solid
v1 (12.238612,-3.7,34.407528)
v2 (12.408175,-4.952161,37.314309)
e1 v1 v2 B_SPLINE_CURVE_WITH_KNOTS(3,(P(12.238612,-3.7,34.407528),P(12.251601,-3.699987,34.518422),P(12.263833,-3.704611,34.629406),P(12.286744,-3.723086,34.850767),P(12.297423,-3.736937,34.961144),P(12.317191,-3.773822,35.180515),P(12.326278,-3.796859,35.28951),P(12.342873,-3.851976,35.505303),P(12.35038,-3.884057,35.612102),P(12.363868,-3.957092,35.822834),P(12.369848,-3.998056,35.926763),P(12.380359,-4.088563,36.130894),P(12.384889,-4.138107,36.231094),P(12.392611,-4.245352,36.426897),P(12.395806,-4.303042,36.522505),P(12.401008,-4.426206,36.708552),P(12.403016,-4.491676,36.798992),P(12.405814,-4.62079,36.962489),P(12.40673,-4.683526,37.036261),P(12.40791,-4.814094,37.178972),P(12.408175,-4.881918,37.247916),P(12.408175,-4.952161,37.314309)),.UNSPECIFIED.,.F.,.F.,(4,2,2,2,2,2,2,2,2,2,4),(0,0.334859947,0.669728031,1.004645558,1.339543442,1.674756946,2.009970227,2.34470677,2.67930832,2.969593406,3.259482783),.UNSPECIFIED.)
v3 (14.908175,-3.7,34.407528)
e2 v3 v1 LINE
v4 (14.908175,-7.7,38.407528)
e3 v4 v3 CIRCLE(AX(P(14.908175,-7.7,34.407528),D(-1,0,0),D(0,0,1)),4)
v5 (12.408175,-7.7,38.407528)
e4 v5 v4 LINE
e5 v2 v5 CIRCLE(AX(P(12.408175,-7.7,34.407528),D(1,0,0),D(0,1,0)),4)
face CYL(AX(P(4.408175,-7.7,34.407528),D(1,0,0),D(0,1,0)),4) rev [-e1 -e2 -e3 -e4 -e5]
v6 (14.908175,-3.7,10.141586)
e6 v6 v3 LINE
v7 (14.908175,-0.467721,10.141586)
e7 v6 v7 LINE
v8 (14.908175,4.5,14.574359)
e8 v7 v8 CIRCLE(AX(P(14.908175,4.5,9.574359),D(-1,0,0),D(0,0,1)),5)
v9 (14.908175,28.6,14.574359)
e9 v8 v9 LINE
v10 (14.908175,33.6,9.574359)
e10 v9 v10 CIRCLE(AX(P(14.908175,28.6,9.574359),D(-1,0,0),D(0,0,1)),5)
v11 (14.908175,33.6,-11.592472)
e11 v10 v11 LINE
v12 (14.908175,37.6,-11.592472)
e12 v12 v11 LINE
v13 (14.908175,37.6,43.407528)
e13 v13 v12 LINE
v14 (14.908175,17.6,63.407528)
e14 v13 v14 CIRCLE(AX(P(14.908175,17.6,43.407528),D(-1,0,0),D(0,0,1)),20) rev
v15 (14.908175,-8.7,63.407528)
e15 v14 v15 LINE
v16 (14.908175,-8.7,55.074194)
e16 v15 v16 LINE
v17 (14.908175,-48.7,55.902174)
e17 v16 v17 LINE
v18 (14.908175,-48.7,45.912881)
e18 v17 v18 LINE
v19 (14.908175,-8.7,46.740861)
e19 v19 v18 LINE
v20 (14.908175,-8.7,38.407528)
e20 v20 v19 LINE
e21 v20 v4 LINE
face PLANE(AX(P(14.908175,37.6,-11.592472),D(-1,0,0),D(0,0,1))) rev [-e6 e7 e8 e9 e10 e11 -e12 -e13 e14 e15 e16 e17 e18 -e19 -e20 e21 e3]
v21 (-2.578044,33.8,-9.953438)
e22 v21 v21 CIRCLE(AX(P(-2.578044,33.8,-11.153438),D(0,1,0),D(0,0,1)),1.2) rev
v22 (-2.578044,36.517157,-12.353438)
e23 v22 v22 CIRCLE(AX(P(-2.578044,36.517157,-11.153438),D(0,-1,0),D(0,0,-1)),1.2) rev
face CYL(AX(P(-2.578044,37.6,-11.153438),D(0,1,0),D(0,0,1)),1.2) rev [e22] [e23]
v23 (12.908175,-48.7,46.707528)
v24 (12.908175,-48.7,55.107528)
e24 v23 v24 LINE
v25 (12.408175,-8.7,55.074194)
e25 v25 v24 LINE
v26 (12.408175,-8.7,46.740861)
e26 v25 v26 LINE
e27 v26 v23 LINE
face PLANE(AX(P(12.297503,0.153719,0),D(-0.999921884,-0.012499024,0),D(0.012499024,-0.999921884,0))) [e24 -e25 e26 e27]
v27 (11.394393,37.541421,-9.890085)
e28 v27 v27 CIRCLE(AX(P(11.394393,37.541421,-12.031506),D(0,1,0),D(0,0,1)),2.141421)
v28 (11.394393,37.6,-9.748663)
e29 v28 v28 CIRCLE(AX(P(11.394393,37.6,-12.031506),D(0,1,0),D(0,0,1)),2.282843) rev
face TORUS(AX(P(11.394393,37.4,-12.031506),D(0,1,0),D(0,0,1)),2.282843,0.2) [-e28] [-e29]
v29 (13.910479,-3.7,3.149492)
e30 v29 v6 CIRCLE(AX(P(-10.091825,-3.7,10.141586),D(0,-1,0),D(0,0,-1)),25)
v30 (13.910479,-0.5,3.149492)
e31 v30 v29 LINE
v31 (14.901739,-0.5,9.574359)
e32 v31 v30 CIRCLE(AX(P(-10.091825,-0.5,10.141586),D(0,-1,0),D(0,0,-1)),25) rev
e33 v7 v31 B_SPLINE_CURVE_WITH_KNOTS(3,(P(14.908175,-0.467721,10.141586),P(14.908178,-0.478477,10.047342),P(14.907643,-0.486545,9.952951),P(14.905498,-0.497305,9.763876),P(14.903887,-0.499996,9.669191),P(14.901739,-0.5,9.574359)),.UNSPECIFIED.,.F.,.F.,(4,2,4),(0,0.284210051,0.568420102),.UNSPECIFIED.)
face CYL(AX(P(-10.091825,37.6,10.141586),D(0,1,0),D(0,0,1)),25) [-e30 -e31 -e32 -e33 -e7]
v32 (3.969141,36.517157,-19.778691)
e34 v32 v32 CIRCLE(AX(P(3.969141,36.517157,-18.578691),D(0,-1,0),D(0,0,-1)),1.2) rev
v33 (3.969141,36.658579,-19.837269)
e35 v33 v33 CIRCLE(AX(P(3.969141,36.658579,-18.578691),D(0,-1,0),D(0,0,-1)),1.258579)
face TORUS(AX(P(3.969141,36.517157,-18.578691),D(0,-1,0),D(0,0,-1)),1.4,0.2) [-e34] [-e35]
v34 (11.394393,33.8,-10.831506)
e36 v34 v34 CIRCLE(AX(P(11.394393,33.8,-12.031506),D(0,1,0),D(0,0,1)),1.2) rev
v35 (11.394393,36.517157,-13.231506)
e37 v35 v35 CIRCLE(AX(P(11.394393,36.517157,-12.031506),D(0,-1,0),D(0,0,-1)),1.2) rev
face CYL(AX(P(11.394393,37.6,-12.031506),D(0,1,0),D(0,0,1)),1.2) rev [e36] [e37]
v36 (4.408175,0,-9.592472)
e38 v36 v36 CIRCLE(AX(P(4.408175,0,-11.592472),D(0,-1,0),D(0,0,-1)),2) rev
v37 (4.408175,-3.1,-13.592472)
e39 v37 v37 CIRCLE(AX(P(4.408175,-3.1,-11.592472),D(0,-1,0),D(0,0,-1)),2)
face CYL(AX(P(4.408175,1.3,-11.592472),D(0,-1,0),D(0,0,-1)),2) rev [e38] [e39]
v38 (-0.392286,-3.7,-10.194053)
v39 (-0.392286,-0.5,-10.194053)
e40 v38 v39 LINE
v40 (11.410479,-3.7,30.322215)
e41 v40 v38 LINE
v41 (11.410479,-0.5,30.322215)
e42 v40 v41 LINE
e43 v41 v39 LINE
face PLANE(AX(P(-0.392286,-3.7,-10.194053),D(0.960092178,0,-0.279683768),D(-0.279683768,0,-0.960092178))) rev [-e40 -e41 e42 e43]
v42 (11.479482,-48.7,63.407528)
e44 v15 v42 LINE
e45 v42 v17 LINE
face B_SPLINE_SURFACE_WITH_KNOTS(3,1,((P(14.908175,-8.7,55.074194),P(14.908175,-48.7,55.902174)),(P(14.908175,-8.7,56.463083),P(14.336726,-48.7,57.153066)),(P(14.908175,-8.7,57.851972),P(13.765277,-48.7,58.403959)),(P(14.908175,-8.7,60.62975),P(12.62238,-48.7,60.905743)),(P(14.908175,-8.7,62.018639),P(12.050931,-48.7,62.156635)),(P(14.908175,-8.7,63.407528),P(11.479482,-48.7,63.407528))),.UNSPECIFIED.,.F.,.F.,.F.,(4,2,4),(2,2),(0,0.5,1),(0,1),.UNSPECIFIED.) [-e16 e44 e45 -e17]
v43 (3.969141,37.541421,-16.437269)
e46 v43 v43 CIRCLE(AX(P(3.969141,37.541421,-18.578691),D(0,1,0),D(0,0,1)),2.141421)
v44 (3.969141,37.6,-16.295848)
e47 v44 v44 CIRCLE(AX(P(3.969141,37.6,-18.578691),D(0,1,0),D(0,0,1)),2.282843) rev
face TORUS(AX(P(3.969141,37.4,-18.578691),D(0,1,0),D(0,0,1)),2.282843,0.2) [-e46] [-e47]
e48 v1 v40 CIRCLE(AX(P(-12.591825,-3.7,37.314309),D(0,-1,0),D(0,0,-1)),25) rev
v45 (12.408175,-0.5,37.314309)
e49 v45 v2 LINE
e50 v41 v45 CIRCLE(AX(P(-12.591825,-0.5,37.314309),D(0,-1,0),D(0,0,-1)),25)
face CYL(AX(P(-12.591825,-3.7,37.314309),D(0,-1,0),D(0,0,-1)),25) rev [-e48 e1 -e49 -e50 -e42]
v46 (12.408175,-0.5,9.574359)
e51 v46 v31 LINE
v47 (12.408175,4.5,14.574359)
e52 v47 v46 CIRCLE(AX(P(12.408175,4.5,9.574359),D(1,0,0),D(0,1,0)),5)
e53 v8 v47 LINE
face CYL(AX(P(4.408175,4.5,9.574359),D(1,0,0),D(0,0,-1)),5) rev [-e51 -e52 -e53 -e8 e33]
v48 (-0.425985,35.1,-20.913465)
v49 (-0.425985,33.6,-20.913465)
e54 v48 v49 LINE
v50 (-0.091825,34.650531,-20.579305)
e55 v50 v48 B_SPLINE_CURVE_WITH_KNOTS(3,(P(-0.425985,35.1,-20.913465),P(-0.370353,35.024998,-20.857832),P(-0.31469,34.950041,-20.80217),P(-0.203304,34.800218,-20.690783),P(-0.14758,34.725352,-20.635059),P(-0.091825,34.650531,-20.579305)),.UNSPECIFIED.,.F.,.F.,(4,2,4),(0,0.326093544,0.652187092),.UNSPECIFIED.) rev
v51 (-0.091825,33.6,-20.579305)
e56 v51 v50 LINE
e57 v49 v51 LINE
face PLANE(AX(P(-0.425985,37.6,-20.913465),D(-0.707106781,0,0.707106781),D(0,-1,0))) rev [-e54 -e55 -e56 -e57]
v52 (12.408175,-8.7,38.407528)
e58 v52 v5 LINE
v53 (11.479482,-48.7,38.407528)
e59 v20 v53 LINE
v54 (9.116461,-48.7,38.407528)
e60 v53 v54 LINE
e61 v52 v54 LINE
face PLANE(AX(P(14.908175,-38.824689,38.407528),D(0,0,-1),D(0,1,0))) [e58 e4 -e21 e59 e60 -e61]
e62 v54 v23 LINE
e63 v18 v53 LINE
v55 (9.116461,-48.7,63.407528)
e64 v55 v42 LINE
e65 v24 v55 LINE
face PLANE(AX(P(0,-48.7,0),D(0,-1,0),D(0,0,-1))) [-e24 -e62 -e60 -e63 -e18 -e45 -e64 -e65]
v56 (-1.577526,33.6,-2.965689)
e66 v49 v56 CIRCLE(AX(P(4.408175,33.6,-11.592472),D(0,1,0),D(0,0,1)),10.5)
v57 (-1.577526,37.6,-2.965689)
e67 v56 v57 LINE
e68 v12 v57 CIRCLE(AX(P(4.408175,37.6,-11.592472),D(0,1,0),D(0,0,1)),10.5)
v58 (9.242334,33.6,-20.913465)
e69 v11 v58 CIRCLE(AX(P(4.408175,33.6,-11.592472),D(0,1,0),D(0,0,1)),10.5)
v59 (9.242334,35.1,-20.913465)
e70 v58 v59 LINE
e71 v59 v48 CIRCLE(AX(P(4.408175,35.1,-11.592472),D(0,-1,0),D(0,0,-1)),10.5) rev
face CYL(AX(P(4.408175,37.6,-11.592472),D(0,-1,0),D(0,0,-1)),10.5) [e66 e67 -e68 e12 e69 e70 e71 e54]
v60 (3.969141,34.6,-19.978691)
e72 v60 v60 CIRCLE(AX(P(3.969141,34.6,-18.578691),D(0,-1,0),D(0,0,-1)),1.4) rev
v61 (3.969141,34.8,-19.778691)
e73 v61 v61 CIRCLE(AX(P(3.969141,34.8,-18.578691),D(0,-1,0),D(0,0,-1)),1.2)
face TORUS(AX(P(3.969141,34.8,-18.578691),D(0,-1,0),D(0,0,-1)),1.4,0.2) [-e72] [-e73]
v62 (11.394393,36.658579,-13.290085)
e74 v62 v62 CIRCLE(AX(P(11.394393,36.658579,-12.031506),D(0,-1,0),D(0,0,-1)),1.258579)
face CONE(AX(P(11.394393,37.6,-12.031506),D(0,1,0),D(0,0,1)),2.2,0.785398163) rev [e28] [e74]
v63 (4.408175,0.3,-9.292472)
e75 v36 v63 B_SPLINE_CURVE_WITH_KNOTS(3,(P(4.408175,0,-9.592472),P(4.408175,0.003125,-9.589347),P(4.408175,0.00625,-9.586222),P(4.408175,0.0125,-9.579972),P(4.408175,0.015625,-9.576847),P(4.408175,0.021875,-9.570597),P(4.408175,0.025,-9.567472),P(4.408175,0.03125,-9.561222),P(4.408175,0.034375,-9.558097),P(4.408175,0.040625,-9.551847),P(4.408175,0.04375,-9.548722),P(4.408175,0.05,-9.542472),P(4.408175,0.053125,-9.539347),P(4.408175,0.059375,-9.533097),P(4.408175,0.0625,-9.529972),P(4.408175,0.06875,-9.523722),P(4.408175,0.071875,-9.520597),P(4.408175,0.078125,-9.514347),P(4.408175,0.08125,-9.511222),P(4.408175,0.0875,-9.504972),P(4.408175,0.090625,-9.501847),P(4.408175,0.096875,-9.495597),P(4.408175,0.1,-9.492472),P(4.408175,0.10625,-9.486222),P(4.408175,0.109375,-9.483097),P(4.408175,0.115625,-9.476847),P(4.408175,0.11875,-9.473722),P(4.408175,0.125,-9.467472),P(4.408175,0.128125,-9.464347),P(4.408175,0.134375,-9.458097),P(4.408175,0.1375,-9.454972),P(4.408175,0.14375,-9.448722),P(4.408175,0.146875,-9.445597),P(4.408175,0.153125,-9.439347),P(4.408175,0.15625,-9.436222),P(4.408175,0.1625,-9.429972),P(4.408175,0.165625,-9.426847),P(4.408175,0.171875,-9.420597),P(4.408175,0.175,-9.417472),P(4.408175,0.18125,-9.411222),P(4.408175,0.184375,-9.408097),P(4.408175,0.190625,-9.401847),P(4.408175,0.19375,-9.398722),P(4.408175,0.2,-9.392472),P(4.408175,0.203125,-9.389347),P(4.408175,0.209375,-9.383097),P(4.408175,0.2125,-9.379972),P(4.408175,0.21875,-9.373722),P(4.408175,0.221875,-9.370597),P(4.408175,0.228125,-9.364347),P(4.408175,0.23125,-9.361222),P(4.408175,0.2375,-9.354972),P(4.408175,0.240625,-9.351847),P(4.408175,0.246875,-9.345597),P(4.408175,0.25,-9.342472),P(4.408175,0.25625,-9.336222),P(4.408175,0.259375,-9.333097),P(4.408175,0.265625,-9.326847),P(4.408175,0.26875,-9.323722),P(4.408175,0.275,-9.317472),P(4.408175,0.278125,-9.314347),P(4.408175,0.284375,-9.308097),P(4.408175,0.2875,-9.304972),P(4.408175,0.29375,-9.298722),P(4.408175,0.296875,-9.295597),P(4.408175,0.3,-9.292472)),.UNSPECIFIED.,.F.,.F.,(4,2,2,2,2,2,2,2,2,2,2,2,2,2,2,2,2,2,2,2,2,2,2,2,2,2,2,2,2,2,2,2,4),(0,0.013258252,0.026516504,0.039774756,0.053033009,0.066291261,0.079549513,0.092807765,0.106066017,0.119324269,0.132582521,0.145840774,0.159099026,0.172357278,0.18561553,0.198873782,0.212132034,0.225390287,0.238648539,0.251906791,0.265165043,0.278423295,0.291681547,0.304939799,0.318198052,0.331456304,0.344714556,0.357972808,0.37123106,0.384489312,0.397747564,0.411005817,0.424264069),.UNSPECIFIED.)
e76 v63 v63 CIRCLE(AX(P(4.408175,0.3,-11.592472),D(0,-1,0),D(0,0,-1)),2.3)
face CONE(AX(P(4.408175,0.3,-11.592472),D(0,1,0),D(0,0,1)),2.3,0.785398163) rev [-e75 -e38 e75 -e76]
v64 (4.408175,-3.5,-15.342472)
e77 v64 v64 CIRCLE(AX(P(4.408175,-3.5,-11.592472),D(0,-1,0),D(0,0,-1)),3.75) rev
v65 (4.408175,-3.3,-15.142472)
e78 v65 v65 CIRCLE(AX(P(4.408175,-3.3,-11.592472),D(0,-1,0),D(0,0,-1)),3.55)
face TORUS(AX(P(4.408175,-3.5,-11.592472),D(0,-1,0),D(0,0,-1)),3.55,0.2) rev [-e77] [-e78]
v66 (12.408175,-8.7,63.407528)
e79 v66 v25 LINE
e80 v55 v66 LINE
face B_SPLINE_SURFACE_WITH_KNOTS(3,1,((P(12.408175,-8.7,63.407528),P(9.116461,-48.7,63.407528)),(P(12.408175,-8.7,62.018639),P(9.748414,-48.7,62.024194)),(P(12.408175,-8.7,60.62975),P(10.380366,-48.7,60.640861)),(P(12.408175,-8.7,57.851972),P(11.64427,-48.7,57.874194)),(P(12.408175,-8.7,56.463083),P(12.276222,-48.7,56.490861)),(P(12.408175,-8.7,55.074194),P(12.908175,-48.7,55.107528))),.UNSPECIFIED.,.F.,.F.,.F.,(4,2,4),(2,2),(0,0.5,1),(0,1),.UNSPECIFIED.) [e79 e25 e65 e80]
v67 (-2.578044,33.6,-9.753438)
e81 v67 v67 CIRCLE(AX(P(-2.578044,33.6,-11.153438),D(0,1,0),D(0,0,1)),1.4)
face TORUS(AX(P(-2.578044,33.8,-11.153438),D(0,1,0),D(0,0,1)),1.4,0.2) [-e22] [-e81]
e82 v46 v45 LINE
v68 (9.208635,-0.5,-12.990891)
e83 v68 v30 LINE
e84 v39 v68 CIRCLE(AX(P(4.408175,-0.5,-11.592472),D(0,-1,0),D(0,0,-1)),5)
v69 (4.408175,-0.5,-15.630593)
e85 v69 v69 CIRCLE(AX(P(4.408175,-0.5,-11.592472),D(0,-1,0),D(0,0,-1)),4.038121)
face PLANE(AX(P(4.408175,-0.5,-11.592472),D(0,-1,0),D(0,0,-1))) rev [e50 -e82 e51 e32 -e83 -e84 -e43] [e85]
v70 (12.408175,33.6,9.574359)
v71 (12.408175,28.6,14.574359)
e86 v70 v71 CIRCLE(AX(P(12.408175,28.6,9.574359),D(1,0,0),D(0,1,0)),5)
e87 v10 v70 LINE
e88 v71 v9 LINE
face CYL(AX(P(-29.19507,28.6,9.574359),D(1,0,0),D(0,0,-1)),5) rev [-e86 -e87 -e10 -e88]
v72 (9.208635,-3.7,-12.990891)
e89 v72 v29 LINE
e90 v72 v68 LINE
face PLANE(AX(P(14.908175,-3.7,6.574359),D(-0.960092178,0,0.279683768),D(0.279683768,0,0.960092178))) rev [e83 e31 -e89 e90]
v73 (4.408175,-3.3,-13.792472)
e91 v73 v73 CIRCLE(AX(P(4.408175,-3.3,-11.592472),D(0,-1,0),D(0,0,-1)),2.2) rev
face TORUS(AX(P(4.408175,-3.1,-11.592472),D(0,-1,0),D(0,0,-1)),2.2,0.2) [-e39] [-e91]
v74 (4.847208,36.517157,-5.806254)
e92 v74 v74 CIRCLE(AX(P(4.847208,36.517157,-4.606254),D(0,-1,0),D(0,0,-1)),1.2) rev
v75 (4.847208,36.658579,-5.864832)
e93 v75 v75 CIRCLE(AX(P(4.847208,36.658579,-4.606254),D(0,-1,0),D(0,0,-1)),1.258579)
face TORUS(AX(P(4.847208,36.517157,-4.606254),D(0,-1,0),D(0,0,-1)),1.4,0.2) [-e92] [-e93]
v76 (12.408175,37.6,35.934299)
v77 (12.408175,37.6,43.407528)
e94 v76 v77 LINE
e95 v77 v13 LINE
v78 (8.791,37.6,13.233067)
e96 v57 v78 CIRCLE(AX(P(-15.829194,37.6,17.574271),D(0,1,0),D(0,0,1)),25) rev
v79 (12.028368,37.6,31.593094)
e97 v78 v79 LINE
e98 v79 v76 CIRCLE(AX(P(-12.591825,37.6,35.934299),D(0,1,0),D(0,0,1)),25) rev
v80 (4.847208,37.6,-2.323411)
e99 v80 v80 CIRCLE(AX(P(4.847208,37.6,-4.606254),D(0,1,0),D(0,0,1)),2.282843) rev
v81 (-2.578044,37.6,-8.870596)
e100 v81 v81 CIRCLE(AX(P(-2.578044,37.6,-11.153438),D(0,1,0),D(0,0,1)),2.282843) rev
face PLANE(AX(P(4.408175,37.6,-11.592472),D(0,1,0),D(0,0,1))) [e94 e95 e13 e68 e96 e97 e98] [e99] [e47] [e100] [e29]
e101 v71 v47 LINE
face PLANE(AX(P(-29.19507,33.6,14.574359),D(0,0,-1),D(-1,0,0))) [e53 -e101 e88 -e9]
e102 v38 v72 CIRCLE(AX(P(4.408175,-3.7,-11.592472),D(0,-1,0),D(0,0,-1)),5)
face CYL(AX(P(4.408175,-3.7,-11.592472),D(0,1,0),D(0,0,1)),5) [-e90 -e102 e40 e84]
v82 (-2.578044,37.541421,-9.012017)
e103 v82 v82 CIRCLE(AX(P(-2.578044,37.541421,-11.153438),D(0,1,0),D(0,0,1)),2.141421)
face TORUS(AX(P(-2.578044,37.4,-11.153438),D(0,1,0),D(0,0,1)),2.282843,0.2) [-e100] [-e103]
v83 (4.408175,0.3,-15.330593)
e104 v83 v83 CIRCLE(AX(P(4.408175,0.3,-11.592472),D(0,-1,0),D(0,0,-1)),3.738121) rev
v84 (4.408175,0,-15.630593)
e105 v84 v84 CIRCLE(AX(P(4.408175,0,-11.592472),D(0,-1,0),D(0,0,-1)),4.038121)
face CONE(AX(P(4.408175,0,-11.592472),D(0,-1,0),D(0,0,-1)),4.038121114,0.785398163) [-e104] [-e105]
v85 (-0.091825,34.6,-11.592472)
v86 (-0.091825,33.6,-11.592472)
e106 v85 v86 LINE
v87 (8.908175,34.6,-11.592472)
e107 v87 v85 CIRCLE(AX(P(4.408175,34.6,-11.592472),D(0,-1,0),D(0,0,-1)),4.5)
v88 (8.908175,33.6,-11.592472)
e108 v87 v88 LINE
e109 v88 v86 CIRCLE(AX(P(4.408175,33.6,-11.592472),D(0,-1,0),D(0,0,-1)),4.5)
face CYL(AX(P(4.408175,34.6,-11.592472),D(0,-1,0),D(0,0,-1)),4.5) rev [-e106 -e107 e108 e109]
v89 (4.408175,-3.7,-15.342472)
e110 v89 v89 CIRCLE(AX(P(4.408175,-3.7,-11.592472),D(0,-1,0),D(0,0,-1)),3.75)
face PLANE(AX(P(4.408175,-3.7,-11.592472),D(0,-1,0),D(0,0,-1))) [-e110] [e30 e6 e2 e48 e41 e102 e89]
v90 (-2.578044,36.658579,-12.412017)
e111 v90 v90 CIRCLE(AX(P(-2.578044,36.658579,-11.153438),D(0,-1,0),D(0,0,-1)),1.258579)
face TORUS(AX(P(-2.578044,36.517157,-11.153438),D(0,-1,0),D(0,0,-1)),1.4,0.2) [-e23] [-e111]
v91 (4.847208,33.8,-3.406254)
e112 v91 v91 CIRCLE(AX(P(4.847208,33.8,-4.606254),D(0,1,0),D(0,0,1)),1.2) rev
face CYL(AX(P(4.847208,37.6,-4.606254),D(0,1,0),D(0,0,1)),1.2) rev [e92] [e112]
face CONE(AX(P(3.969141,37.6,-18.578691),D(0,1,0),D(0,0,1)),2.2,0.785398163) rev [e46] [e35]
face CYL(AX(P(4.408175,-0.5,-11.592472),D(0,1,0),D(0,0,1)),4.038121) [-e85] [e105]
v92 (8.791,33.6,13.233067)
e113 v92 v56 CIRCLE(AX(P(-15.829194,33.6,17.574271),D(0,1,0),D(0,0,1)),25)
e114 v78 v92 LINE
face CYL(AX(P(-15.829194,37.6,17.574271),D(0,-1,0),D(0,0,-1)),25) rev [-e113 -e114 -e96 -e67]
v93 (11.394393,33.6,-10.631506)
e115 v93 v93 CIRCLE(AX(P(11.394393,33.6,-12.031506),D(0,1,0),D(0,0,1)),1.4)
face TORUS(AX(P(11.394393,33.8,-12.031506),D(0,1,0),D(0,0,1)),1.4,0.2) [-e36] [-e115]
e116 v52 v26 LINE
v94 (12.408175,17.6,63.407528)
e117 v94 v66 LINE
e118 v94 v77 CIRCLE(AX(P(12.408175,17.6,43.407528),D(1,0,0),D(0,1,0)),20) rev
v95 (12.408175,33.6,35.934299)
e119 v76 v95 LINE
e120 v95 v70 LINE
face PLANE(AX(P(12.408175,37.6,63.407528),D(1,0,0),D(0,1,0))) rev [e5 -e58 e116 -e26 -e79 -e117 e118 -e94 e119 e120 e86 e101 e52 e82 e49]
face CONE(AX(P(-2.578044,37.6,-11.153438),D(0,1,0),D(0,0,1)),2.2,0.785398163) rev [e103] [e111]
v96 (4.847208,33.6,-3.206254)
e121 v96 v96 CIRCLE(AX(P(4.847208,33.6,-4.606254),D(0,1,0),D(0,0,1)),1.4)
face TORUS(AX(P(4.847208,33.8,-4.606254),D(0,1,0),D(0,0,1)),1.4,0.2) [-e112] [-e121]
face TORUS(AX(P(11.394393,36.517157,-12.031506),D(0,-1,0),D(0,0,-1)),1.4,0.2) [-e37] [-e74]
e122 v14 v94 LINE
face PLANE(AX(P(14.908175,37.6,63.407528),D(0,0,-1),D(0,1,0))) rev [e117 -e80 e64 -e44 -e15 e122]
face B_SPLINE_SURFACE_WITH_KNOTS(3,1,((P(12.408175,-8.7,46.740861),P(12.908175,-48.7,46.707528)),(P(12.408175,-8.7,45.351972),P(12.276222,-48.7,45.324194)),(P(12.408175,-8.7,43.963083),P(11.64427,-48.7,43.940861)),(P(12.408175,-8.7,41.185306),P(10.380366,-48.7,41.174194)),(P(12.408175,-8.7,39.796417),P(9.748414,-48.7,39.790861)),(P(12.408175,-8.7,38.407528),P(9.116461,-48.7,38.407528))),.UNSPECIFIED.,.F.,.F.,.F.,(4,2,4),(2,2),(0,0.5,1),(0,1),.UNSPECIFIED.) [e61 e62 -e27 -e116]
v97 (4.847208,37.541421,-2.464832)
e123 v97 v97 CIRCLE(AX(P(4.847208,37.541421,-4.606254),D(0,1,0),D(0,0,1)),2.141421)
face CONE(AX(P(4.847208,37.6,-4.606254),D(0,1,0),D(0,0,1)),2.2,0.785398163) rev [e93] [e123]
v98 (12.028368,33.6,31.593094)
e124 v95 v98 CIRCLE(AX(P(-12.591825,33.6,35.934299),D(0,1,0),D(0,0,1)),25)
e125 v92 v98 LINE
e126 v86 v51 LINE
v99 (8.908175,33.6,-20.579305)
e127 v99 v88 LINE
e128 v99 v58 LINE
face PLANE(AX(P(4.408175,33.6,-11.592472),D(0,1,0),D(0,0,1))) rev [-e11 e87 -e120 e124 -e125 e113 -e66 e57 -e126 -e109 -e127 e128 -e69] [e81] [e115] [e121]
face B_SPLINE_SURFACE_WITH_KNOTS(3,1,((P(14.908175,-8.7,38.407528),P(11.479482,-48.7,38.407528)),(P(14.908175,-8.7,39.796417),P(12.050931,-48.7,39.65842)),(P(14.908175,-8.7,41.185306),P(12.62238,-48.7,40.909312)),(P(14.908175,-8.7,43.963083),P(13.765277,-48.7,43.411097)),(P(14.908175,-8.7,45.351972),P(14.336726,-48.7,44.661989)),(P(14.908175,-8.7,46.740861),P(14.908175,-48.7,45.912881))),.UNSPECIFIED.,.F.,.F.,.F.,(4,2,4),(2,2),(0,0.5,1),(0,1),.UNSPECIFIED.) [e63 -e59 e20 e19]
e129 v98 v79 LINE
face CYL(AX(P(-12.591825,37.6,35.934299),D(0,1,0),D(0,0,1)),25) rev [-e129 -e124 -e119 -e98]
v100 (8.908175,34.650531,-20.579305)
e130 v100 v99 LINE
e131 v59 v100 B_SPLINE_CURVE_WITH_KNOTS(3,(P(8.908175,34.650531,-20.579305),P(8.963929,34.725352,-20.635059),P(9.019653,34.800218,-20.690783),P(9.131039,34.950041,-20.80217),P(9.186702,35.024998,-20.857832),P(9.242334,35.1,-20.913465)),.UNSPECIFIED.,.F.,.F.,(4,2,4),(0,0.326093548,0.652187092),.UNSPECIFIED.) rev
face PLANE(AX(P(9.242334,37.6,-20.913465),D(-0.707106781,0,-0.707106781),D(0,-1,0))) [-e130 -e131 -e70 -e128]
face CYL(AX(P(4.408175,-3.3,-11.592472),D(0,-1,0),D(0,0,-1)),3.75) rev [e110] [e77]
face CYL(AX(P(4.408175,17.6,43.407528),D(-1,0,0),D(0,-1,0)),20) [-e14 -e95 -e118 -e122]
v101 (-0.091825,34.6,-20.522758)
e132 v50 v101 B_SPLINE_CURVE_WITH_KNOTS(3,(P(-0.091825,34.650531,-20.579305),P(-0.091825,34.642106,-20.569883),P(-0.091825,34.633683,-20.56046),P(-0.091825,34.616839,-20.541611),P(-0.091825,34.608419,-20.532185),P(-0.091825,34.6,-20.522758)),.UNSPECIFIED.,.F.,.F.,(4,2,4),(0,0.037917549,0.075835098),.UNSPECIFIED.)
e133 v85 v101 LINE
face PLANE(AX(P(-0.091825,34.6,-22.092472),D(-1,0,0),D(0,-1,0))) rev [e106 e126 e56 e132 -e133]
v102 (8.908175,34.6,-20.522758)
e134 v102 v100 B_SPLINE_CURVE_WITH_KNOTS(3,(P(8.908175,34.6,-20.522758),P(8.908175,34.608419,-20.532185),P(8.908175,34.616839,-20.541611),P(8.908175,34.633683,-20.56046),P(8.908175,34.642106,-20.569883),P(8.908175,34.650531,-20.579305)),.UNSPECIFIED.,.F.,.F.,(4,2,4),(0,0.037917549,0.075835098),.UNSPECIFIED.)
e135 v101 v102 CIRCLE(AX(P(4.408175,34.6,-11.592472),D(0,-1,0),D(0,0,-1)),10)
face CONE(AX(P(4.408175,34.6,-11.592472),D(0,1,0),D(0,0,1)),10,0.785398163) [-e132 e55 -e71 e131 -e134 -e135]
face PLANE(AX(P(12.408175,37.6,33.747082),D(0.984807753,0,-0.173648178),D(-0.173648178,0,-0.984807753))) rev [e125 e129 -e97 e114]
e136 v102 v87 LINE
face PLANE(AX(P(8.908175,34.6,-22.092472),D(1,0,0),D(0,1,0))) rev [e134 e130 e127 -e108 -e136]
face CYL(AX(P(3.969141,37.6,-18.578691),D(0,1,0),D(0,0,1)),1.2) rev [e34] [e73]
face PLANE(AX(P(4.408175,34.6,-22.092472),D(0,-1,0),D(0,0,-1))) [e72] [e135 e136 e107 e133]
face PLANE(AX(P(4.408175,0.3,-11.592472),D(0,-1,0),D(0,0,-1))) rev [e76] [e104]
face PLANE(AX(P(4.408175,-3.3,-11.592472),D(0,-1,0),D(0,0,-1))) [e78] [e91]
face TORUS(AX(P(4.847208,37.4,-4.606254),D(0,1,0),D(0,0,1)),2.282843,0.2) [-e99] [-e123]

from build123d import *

# Parameters (mm, degrees)
BOSS_EXTRUDE1_DEPTH                                 = 4
CSK_FOR_M2_COUNTERSUNK_FLAT_HEAD_SCREW1_D           = 2.4
CSK_FOR_M2_COUNTERSUNK_FLAT_HEAD_SCREW1_DEPTH       = 4
CSK_FOR_M2_COUNTERSUNK_FLAT_HEAD_SCREW1_CSINK_D     = 4.4
CSK_FOR_M2_COUNTERSUNK_FLAT_HEAD_SCREW1_CSINK_ANGLE = 90
CSK_FOR_M2_COUNTERSUNK_FLAT_HEAD_SCREW1_TIP         = 0.721032743
CUT_EXTRUDE1_DEPTH                                  = 1
BOSS_EXTRUDE2_START                                 = 0.2
SKETCH6_R                                           = 4.038121114
BOSS_EXTRUDE2_DEPTH                                 = 0.8
BOSS_EXTRUDE3_DEPTH                                 = 3.2
SKETCH10_R                                          = 2
CUT_EXTRUDE2_DEPTH                                  = 5
SKETCH11_R                                          = 3.75
CUT_EXTRUDE3_DEPTH                                  = 0.4
SKETCH12_W                                          = 2.5
SKETCH12_H                                          = 25
BOSS_EXTRUDE4_DEPTH                                 = 46.3
SKETCH15_W                                          = 23.833168605
SKETCH15_H                                          = 34.1
BOSS_EXTRUDE5_DEPTH                                 = 2.5
FILLET1_R                                           = 5
FILLET2_R                                           = 20
CHAMFER1_SIZE                                       = 0.3
FILLET3_R                                           = 0.2
CHAMFER2_SIZE                                       = 0.5
FILLET4_R                                           = 0.2
FILLET6_R                                           = 25
FILLET7_R                                           = 4


with BuildPart() as part:
    # Sketch2 → Boss-Extrude1 (new body)
    with BuildSketch(Plane(origin=(0, 33.6, 0), x_dir=(1, 0, 0), z_dir=(0, 1, 0))):
        with BuildLine():
            Line((14.908174518, 11.59247222), (14.908174518, -33.747082129))
            Line((14.908174518, -33.747082129), (14.908174518, -63.40752778))
            Line((14.908174518, -63.40752778), (12.408174518, -63.40752778))
            Line((12.408174518, -63.40752778), (12.408174518, -33.747082129))
            Line((12.408174518, -33.747082129), (6.236730193, 1.252917871))
            ThreePointArc((6.236730193, 1.252917871), (-3.637005238, 18.339699999), (14.908174518, 11.59247222))
        make_face()
    extrude(amount=BOSS_EXTRUDE1_DEPTH)

    # CSK for M2 Countersunk Flat Head Screw1
    with Locations(Plane(origin=(0, 37.6, 0), x_dir=(1, 0, 0), z_dir=(0, 1, 0))):
        with Locations((4.847208305, 4.606253691), (11.394393047, 12.031506008), (3.96914073, 18.578690749), (-2.578044011, 11.153438432)):
            CounterSinkHole(CSK_FOR_M2_COUNTERSUNK_FLAT_HEAD_SCREW1_D / 2, CSK_FOR_M2_COUNTERSUNK_FLAT_HEAD_SCREW1_CSINK_D / 2, depth=CSK_FOR_M2_COUNTERSUNK_FLAT_HEAD_SCREW1_DEPTH, counter_sink_angle=CSK_FOR_M2_COUNTERSUNK_FLAT_HEAD_SCREW1_CSINK_ANGLE)
            with Locations((0, 0, -(CSK_FOR_M2_COUNTERSUNK_FLAT_HEAD_SCREW1_DEPTH + CSK_FOR_M2_COUNTERSUNK_FLAT_HEAD_SCREW1_TIP / 2))):  # 118° drill point
                Cone(0, CSK_FOR_M2_COUNTERSUNK_FLAT_HEAD_SCREW1_D / 2, CSK_FOR_M2_COUNTERSUNK_FLAT_HEAD_SCREW1_TIP, mode=Mode.SUBTRACT)

    # Sketch5 → Cut-Extrude1 (cut)
    with BuildSketch(Plane.XZ.offset(-33.6)):
        with BuildLine():
            Line((-0.091825482, -22.09247222), (-0.091825482, -11.59247222))
            ThreePointArc((-0.091825482, -11.59247222), (4.408174518, -7.09247222), (8.908174518, -11.59247222))
            Line((8.908174518, -11.59247222), (8.908174518, -22.09247222))
            ThreePointArc((8.908174518, -22.09247222), (4.408174518, -26.59247222), (-0.091825482, -22.09247222))
        make_face()
    extrude(amount=-CUT_EXTRUDE1_DEPTH, mode=Mode.SUBTRACT)



with BuildPart() as body_2:
    # Sketch6 → Boss-Extrude2 (new body)
    with BuildSketch(Plane.XZ.offset(-0.5).offset(BOSS_EXTRUDE2_START)):
        with Locations(Location((4.408174518, -11.59247222, 0), (0, 0, 270))):
            Circle(SKETCH6_R)
    extrude(amount=BOSS_EXTRUDE2_DEPTH)

    # Sketch7 → Boss-Extrude3 (add)
    with BuildSketch(Plane.XZ.offset(0.5)):
        with BuildLine():
            Line((-0.392286371, -10.194053378), (12.408174518, 33.747082129))
            Line((12.408174518, 33.747082129), (12.408174518, 63.40752778))
            Line((12.408174518, 63.40752778), (14.908174518, 63.40752778))
            Line((14.908174518, 63.40752778), (14.908174518, 6.574359175))
            Line((14.908174518, 6.574359175), (9.208635406, -12.990891062))
            ThreePointArc((9.208635406, -12.990891062), (3.009755675, -16.392933108), (-0.392286371, -10.194053378))
        make_face()
    extrude(amount=BOSS_EXTRUDE3_DEPTH)

    # Sketch10 → Cut-Extrude2 (cut)
    with BuildSketch(Plane.XZ.offset(3.7)):
        with Locations(Location((4.408174518, -11.59247222, 0), (0, 0, 270))):
            Circle(SKETCH10_R)
    extrude(amount=-CUT_EXTRUDE2_DEPTH, mode=Mode.SUBTRACT)

    # Sketch11 → Cut-Extrude3 (cut)
    with BuildSketch(Plane.XZ.offset(3.7)):
        with Locations(Location((4.408174518, -11.59247222, 0), (0, 0, 270))):
            Circle(SKETCH11_R)
    extrude(amount=-CUT_EXTRUDE3_DEPTH, mode=Mode.SUBTRACT)


with BuildPart() as part_1:
    add(part.part)

    add(body_2.part)  # Boss-Extrude4 merges body 2
    # Sketch12 → Boss-Extrude4 (add)
    with BuildSketch(Plane(origin=(0, 37.6, 0), x_dir=(1, 0, 0), z_dir=(0, 1, 0))):
        with Locations((13.658174518, -50.90752778)):
            Rectangle(SKETCH12_W, SKETCH12_H)
    extrude(amount=-BOSS_EXTRUDE4_DEPTH)

    # Sketch15 → Boss-Extrude5 (add)
    with BuildSketch(Plane(origin=(14.908174518, 0, 0), x_dir=(0, 0, -1), z_dir=(1, 0, 0))):
        with Locations((-26.490943478, 16.55)):
            Rectangle(SKETCH15_W, SKETCH15_H)
    extrude(amount=-BOSS_EXTRUDE5_DEPTH)

    # Fillet1
    fillet1_edges = [part_1.edges().sort_by_distance(p)[0] for p in [
        (13.658174518, 33.6, 14.574359175),
        (13.658174518, -0.5, 14.574359175),
    ]]
    fillet(fillet1_edges, radius=FILLET1_R)

    # Fillet2
    fillet2_edges = [part_1.edges().sort_by_distance(p)[0] for p in [
        (13.658174518, 37.6, 63.40752778),
    ]]
    fillet(fillet2_edges, radius=FILLET2_R)

    # Chamfer1
    chamfer1_edges = [part_1.edges().sort_by_distance(p)[0] for p in [
        (4.408174518, 0.3, -7.554351106),
        (4.408174518, 0.3, -9.59247222),
    ]]
    chamfer(chamfer1_edges, length=CHAMFER1_SIZE)

    # Fillet3
    fillet3_edges = [part_1.edges().sort_by_distance(p)[0] for p in [
        (4.408174518, -3.3, -7.84247222),
        (4.408174518, -3.3, -9.59247222),
    ]]
    fillet(fillet3_edges, radius=FILLET3_R)

    # Chamfer2
    # the kernel refuses this chamfer: 0.5, 0.37535302 mm, written as the material it takes off along each edge
    with BuildSketch(Plane(origin=(-0.091825482, 34.6, -21.0793052), x_dir=(-0.8957520847701, 0, 0.4445539366938725), z_dir=(0, -1, 0))) as chamfer2_piece_1:
        with BuildLine():
            Line((0.373049134, 0), (CHAMFER2_SIZE * 0.444553936694, -CHAMFER2_SIZE * 0.89575208477))
            Line((CHAMFER2_SIZE * 0.444553936694, -CHAMFER2_SIZE * 0.89575208477), (0, 0))
            ThreePointArc((0, 0), (0.189712645, 0.001656381), (0.373049134, 0))
        make_face()
    extrude(amount=2.285841494, mode=Mode.SUBTRACT)
    with BuildSketch(Plane(origin=(8.908174518, 34.6, -21.0793052), x_dir=(0.895752084770101, 0, 0.4445539366938706), z_dir=(0, -1, 0))) as chamfer2_piece_2:
        with BuildLine():
            Line((0.373049134, 0), (CHAMFER2_SIZE * 0.444553936694, CHAMFER2_SIZE * 0.89575208477))
            Line((CHAMFER2_SIZE * 0.444553936694, CHAMFER2_SIZE * 0.89575208477), (0, 0))
            ThreePointArc((0, 0), (0.189712645, -0.001656381), (0.373049134, 0))
        make_face()
    extrude(amount=2.285841494, mode=Mode.SUBTRACT)
    with BuildSketch(Plane(origin=(4.408174518, 34.6, -11.59247222), x_dir=(-0.5357432905270894, 0, -0.8443809132466265), z_dir=(-0.8443809132466265, 0, 0.5357432905270894))) as chamfer2_piece_3_section:
        Polygon((10.5, -CHAMFER2_SIZE), (10.5 - CHAMFER2_SIZE, 0), (10.5, 0), align=None)
    chamfer2_piece_3 = revolve(axis=Axis((4.408174518, 34.6, -11.59247222), (0, -1, 0)), revolution_arc=64.788667193, mode=Mode.PRIVATE)
    chamfer2_piece_3 = split(chamfer2_piece_3, bisect_by=Plane(origin=(-0.091825482, 34.6, -11.59247222), z_dir=(1, 0, 0)), keep=Keep.TOP, mode=Mode.PRIVATE)
    chamfer2_piece_3 = split(chamfer2_piece_3, bisect_by=Plane(origin=(8.908174518, 34.6, -11.59247222), z_dir=(-1, 0, 0)), keep=Keep.TOP, mode=Mode.PRIVATE)
    add(chamfer2_piece_3, mode=Mode.SUBTRACT)
    with BuildSketch(Plane(origin=(-0.091825482, 35.885841494, -21.0793052), x_dir=(-0.8957520847701, 0, 0.4445539366938725), z_dir=(0, -1, 0))) as chamfer2_piece_4a_section:
        with BuildLine():
            Line((0.373049134, 0), (CHAMFER2_SIZE * 0.444553936694, -CHAMFER2_SIZE * 0.89575208477))
            Line((CHAMFER2_SIZE * 0.444553936694, -CHAMFER2_SIZE * 0.89575208477), (0, 0))
            ThreePointArc((0, 0), (0.189712645, 0.001656381), (0.373049134, 0))
        make_face()
    chamfer2_piece_4a = extrude(amount=3.571682988, mode=Mode.PRIVATE)
    chamfer2_piece_4a = split(chamfer2_piece_4a, bisect_by=Plane(origin=(-0.091825482, 34.6, -21.0793052), z_dir=(0, 1, 0)), keep=Keep.TOP, mode=Mode.PRIVATE)
    with BuildSketch(Plane(origin=(4.408174518, 34.6, -11.59247222), x_dir=(-0.5357432905270894, 0, -0.8443809132466265), z_dir=(-0.8443809132466265, 0, 0.5357432905270894))) as chamfer2_piece_4b_section:
        Polygon((10.5, -CHAMFER2_SIZE), (10.5 - CHAMFER2_SIZE, 0), (10.5, 0), align=None)
    chamfer2_piece_4b = revolve(axis=Axis((4.408174518, 34.6, -11.59247222), (0, -1, 0)), revolution_arc=64.788667193, mode=Mode.PRIVATE)
    chamfer2_piece_4b = split(chamfer2_piece_4b, bisect_by=Plane(origin=(-0.091825482, 34.6, -11.59247222), z_dir=(-1, 0, 0)), keep=Keep.TOP, mode=Mode.PRIVATE)
    chamfer2_piece_4 = chamfer2_piece_4a & chamfer2_piece_4b
    add(chamfer2_piece_4, mode=Mode.SUBTRACT)
    with BuildSketch(Plane(origin=(4.408174518, 34.6, -11.59247222), x_dir=(-0.5357432905270894, 0, -0.8443809132466265), z_dir=(-0.8443809132466265, 0, 0.5357432905270894))) as chamfer2_piece_5a_section:
        Polygon((10.5, -CHAMFER2_SIZE), (10.5 - CHAMFER2_SIZE, 0), (10.5, 0), align=None)
    chamfer2_piece_5a = revolve(axis=Axis((4.408174518, 34.6, -11.59247222), (0, -1, 0)), revolution_arc=64.788667193, mode=Mode.PRIVATE)
    chamfer2_piece_5a = split(chamfer2_piece_5a, bisect_by=Plane(origin=(8.908174518, 34.6, -11.59247222), z_dir=(1, 0, 0)), keep=Keep.TOP, mode=Mode.PRIVATE)
    with BuildSketch(Plane(origin=(8.908174518, 35.885841494, -21.0793052), x_dir=(0.895752084770101, 0, 0.4445539366938706), z_dir=(0, -1, 0))) as chamfer2_piece_5b_section:
        with BuildLine():
            Line((0.373049134, 0), (CHAMFER2_SIZE * 0.444553936694, CHAMFER2_SIZE * 0.89575208477))
            Line((CHAMFER2_SIZE * 0.444553936694, CHAMFER2_SIZE * 0.89575208477), (0, 0))
            ThreePointArc((0, 0), (0.189712645, -0.001656381), (0.373049134, 0))
        make_face()
    chamfer2_piece_5b = extrude(amount=3.571682988, mode=Mode.PRIVATE)
    chamfer2_piece_5b = split(chamfer2_piece_5b, bisect_by=Plane(origin=(8.908174518, 34.6, -21.0793052), z_dir=(0, 1, 0)), keep=Keep.TOP, mode=Mode.PRIVATE)
    chamfer2_piece_5 = chamfer2_piece_5a & chamfer2_piece_5b
    add(chamfer2_piece_5, mode=Mode.SUBTRACT)

    # Fillet4
    fillet4_edges = [part_1.edges().sort_by_distance(p)[0] for p in [
        (-0.378044011, 37.6, -11.153438432),
        (-1.378044011, 33.6, -11.153438432),
        (-1.378044011, 36.6, -11.153438432),
        (6.16914073, 37.6, -18.578690749),
        (5.16914073, 36.6, -18.578690749),
        (13.594393047, 37.6, -12.031506008),
        (12.594393047, 33.6, -12.031506008),
        (12.594393047, 36.6, -12.031506008),
        (7.047208305, 37.6, -4.606253691),
        (6.047208305, 33.6, -4.606253691),
        (6.047208305, 36.6, -4.606253691),
        (5.16914073, 34.6, -18.578690749),
    ]]
    fillet(fillet4_edges, radius=FILLET4_R)

    # Fillet6
    fillet6_edges = [part_1.edges().sort_by_distance(p)[0] for p in [
        (12.408174518, 35.6, 33.747082129),
        (6.236730193, 35.6, -1.252917871),
        (14.908174518, -2.1, 6.574359175),
        (12.408174518, -2.1, 33.747082129),
    ]]
    fillet(fillet6_edges, radius=FILLET6_R)

    # Fillet7
    fillet7_edges = [part_1.edges().sort_by_distance(p)[0] for p in [
        (13.658174518, -3.7, 38.40752778),
    ]]
    fillet(fillet7_edges, radius=FILLET7_R)

    # Loft1: read off the stored shape, not the designer's step
    # Loft1: loft between two sections, ruled curve by curve
    loft1_from = [
        Edge.make_bspline([(12.408174518, -8.7, 63.40752778), (12.408174518, -8.7, 62.018638891), (12.408174518, -8.7, 60.629750002), (12.408174518, -8.7, 57.851972225), (12.408174518, -8.7, 56.463083336), (12.408174518, -8.7, 55.074194447)], [0, 0, 0, 0, 0.5, 0.5, 1, 1, 1, 1], 3),
        Edge.make_bspline([(12.408174518, -8.7, 46.740861113), (12.408174518, -8.7, 45.351972225), (12.408174518, -8.7, 43.963083336), (12.408174518, -8.7, 41.185305558), (12.408174518, -8.7, 39.796416669), (12.408174518, -8.7, 38.40752778)], [0, 0, 0, 0, 0.5, 0.5, 1, 1, 1, 1], 3),
        Edge.make_bspline([(14.908174518, -8.7, 38.40752778), (14.908174518, -8.7, 39.796416669), (14.908174518, -8.7, 41.185305558), (14.908174518, -8.7, 43.963083336), (14.908174518, -8.7, 45.351972225), (14.908174518, -8.7, 46.740861113)], [0, 0, 0, 0, 0.5, 0.5, 1, 1, 1, 1], 3),
        Edge.make_bspline([(14.908174518, -8.7, 55.074194447), (14.908174518, -8.7, 56.463083336), (14.908174518, -8.7, 57.851972225), (14.908174518, -8.7, 60.629750002), (14.908174518, -8.7, 62.018638891), (14.908174518, -8.7, 63.40752778)], [0, 0, 0, 0, 0.5, 0.5, 1, 1, 1, 1], 3),
        Edge.make_line((12.408174518, -8.7, 46.740861113), (12.408174518, -8.7, 55.074194447)),
        Edge.make_line((14.908174518, -8.7, 38.40752778), (12.408174518, -8.7, 38.40752778)),
        Edge.make_line((14.908174518, -8.7, 63.40752778), (12.408174518, -8.7, 63.40752778)),
        Edge.make_line((14.908174518, -8.7, 55.074194447), (14.908174518, -8.7, 46.740861113)),
    ]
    loft1_to = [
        Edge.make_bspline([(9.116461452, -48.7, 63.40752778), (9.748413629, -48.7, 62.024194447), (10.380365807, -48.7, 60.640861113), (11.644270162, -48.7, 57.874194447), (12.27622234, -48.7, 56.490861113), (12.908174518, -48.7, 55.10752778)], [0, 0, 0, 0, 0.5, 0.5, 1, 1, 1, 1], 3),
        Edge.make_bspline([(12.908174518, -48.7, 46.70752778), (12.27622234, -48.7, 45.324194447), (11.644270162, -48.7, 43.940861113), (10.380365807, -48.7, 41.174194447), (9.748413629, -48.7, 39.790861113), (9.116461452, -48.7, 38.40752778)], [0, 0, 0, 0, 0.5, 0.5, 1, 1, 1, 1], 3),
        Edge.make_bspline([(11.479482023, -48.7, 38.40752778), (12.050930772, -48.7, 39.658420064), (12.622379522, -48.7, 40.909312348), (13.76527702, -48.7, 43.411096916), (14.336725769, -48.7, 44.661989199), (14.908174518, -48.7, 45.912881483)], [0, 0, 0, 0, 0.5, 0.5, 1, 1, 1, 1], 3),
        Edge.make_bspline([(14.908174518, -48.7, 55.902174077), (14.336725769, -48.7, 57.153066361), (13.76527702, -48.7, 58.403958645), (12.622379522, -48.7, 60.905743212), (12.050930772, -48.7, 62.156635496), (11.479482023, -48.7, 63.40752778)], [0, 0, 0, 0, 0.5, 0.5, 1, 1, 1, 1], 3),
        Edge.make_line((12.908174518, -48.7, 46.70752778), (12.908174518, -48.7, 55.10752778)),
        Edge.make_line((11.479482023, -48.7, 38.40752778), (9.116461452, -48.7, 38.40752778)),
        Edge.make_line((11.479482023, -48.7, 63.40752778), (9.116461452, -48.7, 63.40752778)),
        Edge.make_line((14.908174518, -48.7, 55.902174077), (14.908174518, -48.7, 45.912881483)),
    ]
    loft1 = Solid(Shell([*[Face.make_surface_from_curves(loft1_from[k], loft1_to[k]) for k in range(8)], Face(Wire(loft1_from)), Face(Wire(loft1_to))]))
    add(loft1)


solid = part_1.part
